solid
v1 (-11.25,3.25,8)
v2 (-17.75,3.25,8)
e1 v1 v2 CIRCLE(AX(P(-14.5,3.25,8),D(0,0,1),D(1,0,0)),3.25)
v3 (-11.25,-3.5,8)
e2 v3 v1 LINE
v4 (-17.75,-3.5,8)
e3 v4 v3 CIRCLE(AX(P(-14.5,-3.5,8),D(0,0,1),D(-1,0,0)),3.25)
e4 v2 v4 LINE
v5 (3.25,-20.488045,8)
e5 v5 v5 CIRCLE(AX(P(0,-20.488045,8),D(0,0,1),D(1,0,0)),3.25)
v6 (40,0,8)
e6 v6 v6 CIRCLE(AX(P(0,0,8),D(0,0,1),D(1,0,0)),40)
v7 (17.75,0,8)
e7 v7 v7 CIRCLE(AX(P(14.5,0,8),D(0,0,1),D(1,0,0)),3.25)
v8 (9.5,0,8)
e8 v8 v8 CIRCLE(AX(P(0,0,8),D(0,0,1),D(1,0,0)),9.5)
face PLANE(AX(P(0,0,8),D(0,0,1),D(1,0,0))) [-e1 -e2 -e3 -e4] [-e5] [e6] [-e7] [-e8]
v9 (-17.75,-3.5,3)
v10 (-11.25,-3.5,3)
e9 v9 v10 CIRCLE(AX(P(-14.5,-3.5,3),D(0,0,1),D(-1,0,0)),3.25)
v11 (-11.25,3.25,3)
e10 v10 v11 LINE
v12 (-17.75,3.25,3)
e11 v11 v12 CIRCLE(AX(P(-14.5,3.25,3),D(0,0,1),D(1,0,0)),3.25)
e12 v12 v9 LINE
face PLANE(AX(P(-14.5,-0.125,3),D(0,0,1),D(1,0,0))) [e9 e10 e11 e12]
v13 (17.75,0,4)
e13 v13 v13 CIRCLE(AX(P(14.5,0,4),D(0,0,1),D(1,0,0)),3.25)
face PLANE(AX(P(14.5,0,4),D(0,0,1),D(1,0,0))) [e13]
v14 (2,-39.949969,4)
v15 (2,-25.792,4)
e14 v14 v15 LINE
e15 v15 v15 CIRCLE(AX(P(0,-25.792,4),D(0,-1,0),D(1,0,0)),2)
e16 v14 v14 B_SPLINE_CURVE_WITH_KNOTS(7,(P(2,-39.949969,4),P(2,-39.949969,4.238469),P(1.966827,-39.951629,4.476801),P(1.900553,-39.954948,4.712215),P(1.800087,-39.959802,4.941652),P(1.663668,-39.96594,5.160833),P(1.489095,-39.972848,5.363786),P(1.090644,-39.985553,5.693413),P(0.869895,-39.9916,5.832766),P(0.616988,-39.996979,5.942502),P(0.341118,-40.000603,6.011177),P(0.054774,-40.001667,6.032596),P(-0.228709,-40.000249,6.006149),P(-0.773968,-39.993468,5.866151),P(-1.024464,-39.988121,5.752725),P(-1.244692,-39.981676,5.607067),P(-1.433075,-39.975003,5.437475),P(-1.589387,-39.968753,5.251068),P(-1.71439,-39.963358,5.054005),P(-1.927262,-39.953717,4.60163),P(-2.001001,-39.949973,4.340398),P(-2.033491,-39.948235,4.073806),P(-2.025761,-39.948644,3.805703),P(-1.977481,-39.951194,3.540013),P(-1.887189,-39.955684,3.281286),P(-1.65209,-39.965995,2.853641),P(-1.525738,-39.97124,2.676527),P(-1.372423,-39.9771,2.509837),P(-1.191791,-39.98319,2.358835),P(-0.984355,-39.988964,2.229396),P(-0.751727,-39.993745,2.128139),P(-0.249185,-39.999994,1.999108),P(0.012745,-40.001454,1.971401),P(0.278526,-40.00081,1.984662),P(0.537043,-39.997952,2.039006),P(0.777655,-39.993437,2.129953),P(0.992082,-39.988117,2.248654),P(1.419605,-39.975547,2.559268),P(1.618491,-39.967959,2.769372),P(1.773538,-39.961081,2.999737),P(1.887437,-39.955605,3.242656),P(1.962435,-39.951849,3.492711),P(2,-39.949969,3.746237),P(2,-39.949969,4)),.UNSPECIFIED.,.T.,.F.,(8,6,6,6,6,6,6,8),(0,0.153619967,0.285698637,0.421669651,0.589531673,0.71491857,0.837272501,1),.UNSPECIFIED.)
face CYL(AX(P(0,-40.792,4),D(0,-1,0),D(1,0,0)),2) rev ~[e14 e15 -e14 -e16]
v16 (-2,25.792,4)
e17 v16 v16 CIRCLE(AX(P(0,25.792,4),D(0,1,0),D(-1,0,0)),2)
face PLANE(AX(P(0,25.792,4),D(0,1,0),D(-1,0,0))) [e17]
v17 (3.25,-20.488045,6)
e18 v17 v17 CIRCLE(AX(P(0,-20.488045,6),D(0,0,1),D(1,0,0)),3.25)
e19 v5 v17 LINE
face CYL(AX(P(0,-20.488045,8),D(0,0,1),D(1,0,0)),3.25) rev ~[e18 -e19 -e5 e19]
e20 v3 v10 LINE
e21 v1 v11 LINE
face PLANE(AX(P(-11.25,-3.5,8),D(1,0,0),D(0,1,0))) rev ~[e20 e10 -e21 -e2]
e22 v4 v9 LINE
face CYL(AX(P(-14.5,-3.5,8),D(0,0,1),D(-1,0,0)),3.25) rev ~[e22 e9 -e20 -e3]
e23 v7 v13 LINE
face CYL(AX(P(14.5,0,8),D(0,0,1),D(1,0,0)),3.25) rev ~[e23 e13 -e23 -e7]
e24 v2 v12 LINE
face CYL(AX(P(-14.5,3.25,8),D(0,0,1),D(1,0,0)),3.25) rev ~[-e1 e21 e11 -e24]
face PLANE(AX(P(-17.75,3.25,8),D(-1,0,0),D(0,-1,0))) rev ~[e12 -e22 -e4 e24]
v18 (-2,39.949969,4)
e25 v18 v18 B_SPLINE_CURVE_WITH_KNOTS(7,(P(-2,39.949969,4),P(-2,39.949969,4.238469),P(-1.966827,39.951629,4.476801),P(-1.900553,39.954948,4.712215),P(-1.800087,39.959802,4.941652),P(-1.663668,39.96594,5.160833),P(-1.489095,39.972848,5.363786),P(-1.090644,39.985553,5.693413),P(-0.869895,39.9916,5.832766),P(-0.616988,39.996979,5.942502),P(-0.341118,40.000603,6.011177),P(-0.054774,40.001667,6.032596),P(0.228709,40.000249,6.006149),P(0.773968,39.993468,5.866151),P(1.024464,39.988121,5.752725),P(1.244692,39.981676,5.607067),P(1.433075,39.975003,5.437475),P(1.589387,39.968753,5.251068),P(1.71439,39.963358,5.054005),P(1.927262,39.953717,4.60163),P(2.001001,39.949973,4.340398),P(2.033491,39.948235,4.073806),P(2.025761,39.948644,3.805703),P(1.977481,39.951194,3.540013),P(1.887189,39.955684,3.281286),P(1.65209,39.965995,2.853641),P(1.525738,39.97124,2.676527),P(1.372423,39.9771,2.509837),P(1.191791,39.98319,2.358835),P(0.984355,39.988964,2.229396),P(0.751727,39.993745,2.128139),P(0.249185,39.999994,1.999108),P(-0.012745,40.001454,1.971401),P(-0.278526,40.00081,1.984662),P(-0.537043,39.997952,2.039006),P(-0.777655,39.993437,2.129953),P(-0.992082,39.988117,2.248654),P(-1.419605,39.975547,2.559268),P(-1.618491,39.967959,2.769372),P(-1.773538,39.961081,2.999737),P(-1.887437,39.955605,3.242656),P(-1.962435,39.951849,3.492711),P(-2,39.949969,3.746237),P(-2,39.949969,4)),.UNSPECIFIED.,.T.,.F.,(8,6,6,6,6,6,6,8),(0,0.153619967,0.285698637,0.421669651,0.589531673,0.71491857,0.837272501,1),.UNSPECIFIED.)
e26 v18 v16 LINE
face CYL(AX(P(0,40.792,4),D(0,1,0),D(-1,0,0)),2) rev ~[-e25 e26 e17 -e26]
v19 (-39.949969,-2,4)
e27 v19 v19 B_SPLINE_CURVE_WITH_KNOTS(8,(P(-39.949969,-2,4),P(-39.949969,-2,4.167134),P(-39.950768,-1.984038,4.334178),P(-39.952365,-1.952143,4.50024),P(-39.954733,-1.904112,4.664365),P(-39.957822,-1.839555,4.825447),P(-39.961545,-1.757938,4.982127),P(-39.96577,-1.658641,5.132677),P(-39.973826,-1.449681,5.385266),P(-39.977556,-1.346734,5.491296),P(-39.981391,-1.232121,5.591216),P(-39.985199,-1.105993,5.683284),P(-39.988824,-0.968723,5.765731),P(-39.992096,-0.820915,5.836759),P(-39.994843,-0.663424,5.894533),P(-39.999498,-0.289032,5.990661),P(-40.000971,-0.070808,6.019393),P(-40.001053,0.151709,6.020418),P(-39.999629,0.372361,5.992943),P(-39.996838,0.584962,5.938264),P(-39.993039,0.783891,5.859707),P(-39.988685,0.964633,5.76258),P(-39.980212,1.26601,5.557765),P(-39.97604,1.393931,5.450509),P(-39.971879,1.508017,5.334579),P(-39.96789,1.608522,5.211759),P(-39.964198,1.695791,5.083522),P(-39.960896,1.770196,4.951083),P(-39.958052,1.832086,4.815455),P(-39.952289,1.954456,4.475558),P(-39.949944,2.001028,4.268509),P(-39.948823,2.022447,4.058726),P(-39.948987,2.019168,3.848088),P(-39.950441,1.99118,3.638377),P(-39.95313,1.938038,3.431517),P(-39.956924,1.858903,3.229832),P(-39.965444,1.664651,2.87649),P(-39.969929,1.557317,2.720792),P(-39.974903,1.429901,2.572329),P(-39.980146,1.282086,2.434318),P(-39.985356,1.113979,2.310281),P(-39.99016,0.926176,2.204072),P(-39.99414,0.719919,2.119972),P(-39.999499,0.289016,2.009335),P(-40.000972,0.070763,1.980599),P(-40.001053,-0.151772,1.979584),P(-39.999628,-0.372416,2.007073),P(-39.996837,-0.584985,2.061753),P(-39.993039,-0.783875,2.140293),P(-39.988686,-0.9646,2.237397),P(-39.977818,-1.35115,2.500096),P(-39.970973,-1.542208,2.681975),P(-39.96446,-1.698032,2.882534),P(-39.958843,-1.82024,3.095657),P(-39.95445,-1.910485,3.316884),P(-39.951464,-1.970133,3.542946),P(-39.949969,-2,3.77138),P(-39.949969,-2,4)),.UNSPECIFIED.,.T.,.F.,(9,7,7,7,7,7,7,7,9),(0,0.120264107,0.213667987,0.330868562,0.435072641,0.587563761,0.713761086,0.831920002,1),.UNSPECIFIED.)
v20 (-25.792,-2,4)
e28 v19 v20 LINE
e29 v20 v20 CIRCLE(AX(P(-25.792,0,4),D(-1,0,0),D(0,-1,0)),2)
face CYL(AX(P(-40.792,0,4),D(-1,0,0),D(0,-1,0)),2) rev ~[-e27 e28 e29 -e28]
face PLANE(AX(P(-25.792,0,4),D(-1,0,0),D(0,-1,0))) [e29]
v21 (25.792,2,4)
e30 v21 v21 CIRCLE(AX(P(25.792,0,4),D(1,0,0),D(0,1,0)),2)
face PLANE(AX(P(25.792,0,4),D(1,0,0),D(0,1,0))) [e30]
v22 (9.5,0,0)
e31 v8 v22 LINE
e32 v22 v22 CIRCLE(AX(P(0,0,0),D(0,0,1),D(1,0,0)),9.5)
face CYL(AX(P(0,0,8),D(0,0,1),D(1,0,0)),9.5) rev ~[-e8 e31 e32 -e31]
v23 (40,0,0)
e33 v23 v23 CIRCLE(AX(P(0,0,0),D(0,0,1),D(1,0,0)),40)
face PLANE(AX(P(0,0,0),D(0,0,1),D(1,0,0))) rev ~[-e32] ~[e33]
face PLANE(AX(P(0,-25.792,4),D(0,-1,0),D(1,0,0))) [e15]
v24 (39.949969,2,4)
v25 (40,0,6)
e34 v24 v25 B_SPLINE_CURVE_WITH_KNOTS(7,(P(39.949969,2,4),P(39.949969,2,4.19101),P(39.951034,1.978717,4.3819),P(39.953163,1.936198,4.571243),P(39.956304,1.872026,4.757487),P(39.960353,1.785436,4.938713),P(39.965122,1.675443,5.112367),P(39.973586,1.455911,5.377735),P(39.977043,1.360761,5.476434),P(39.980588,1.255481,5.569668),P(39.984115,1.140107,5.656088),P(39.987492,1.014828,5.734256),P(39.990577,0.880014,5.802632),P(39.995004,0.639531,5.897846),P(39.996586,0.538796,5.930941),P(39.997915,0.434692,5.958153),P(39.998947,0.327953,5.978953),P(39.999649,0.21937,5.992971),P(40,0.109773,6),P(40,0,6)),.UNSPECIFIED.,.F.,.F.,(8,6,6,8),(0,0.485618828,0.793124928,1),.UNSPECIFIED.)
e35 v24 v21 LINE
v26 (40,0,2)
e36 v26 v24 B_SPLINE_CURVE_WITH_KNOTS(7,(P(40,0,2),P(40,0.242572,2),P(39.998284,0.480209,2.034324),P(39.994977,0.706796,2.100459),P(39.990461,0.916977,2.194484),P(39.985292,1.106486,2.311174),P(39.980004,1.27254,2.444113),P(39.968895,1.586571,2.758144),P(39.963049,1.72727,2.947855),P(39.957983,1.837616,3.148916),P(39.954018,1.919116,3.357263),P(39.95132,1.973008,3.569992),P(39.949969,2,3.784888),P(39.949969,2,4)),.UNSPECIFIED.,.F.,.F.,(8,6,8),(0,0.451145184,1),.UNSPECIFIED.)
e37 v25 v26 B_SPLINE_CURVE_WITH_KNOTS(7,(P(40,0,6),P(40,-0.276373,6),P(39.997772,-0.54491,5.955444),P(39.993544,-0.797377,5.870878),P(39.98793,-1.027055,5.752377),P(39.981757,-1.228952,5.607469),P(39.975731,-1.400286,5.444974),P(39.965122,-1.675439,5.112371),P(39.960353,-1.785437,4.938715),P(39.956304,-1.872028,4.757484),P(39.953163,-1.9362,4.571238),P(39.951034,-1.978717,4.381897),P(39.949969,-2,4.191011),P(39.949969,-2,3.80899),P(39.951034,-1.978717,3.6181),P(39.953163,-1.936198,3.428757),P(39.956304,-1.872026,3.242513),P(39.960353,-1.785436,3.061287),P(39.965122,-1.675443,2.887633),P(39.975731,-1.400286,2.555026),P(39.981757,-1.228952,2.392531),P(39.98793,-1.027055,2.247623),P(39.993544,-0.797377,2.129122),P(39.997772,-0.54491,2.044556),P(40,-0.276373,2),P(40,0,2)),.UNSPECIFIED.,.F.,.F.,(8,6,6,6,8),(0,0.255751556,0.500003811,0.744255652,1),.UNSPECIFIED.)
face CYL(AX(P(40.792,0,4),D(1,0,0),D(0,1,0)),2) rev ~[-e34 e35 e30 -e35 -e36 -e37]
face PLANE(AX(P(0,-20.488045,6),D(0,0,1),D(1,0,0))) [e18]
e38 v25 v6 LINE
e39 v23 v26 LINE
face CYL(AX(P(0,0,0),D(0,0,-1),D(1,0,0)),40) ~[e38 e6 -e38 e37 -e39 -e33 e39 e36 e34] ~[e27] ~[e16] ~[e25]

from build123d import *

# Parameters (mm, degrees)
F0_R             = 40
F1_DEPTH         = 8
F2_R             = 9.5
F3_DEPTH         = 8.001
F5_R             = 3.25
F6_DEPTH         = 4
F8_DEPTH         = 5
F9_R             = 3.25
F10_DEPTH        = 2
F12_R            = 2
F13_DEPTH        = 15
F13_COPIES_COUNT = 4


# Not quite as in the source:
# - a pattern or mirror of a feature is missing from the dataset's text; its kind, count and spacing are read off the source's solid


with BuildPart() as f1:
    # F0 (on Top) → F1 (new body)
    with BuildSketch(Plane.XY):
        Circle(F0_R)
    extrude(amount=F1_DEPTH)

    # F2 (on face) → F3 (cut, through all)
    with BuildSketch(Plane.XY.offset(8)):
        Circle(F2_R)
    extrude(amount=-F3_DEPTH, mode=Mode.SUBTRACT)

    # F5 (on face) → F6 (cut)
    with BuildSketch(Plane.XY.offset(8)):
        with Locations((14.5, 0)):
            Circle(F5_R)
    extrude(amount=-F6_DEPTH, mode=Mode.SUBTRACT)

    # F7 (on face) → F8 (cut)
    with BuildSketch(Plane.XY.offset(8)):
        with BuildLine():
            Line((-17.75, 3.25), (-17.75, -3.5))
            ThreePointArc((-17.75, -3.5), (-14.5, -6.75), (-11.25, -3.5))
            Line((-11.25, -3.5), (-11.25, 3.25))
            ThreePointArc((-11.25, 3.25), (-14.5, 6.5), (-17.75, 3.25))
        make_face()
    extrude(amount=-F8_DEPTH, mode=Mode.SUBTRACT)

    # F9 (on face) → F10 (cut)
    with BuildSketch(Plane.XY.offset(8)):
        with Locations((0, -20.4880452948)):
            Circle(F9_R)
    extrude(amount=-F10_DEPTH, mode=Mode.SUBTRACT)

    # F12 (on offset) → F13 (cut)
    with BuildSketch(Plane.XZ.offset(40.792)):
        with Locations((0, 4)):
            Circle(F12_R)
    f13 = extrude(amount=-F13_DEPTH, mode=Mode.SUBTRACT)

    # F13_copies: F13 ×4 about axis
    f13_copies_axis = Axis((0, 0, 0), (0, 0, 1))
    for i in range(1, F13_COPIES_COUNT):
        add(f13.rotate(f13_copies_axis, i * 360 / F13_COPIES_COUNT), mode=Mode.SUBTRACT)


solid = f1.part
